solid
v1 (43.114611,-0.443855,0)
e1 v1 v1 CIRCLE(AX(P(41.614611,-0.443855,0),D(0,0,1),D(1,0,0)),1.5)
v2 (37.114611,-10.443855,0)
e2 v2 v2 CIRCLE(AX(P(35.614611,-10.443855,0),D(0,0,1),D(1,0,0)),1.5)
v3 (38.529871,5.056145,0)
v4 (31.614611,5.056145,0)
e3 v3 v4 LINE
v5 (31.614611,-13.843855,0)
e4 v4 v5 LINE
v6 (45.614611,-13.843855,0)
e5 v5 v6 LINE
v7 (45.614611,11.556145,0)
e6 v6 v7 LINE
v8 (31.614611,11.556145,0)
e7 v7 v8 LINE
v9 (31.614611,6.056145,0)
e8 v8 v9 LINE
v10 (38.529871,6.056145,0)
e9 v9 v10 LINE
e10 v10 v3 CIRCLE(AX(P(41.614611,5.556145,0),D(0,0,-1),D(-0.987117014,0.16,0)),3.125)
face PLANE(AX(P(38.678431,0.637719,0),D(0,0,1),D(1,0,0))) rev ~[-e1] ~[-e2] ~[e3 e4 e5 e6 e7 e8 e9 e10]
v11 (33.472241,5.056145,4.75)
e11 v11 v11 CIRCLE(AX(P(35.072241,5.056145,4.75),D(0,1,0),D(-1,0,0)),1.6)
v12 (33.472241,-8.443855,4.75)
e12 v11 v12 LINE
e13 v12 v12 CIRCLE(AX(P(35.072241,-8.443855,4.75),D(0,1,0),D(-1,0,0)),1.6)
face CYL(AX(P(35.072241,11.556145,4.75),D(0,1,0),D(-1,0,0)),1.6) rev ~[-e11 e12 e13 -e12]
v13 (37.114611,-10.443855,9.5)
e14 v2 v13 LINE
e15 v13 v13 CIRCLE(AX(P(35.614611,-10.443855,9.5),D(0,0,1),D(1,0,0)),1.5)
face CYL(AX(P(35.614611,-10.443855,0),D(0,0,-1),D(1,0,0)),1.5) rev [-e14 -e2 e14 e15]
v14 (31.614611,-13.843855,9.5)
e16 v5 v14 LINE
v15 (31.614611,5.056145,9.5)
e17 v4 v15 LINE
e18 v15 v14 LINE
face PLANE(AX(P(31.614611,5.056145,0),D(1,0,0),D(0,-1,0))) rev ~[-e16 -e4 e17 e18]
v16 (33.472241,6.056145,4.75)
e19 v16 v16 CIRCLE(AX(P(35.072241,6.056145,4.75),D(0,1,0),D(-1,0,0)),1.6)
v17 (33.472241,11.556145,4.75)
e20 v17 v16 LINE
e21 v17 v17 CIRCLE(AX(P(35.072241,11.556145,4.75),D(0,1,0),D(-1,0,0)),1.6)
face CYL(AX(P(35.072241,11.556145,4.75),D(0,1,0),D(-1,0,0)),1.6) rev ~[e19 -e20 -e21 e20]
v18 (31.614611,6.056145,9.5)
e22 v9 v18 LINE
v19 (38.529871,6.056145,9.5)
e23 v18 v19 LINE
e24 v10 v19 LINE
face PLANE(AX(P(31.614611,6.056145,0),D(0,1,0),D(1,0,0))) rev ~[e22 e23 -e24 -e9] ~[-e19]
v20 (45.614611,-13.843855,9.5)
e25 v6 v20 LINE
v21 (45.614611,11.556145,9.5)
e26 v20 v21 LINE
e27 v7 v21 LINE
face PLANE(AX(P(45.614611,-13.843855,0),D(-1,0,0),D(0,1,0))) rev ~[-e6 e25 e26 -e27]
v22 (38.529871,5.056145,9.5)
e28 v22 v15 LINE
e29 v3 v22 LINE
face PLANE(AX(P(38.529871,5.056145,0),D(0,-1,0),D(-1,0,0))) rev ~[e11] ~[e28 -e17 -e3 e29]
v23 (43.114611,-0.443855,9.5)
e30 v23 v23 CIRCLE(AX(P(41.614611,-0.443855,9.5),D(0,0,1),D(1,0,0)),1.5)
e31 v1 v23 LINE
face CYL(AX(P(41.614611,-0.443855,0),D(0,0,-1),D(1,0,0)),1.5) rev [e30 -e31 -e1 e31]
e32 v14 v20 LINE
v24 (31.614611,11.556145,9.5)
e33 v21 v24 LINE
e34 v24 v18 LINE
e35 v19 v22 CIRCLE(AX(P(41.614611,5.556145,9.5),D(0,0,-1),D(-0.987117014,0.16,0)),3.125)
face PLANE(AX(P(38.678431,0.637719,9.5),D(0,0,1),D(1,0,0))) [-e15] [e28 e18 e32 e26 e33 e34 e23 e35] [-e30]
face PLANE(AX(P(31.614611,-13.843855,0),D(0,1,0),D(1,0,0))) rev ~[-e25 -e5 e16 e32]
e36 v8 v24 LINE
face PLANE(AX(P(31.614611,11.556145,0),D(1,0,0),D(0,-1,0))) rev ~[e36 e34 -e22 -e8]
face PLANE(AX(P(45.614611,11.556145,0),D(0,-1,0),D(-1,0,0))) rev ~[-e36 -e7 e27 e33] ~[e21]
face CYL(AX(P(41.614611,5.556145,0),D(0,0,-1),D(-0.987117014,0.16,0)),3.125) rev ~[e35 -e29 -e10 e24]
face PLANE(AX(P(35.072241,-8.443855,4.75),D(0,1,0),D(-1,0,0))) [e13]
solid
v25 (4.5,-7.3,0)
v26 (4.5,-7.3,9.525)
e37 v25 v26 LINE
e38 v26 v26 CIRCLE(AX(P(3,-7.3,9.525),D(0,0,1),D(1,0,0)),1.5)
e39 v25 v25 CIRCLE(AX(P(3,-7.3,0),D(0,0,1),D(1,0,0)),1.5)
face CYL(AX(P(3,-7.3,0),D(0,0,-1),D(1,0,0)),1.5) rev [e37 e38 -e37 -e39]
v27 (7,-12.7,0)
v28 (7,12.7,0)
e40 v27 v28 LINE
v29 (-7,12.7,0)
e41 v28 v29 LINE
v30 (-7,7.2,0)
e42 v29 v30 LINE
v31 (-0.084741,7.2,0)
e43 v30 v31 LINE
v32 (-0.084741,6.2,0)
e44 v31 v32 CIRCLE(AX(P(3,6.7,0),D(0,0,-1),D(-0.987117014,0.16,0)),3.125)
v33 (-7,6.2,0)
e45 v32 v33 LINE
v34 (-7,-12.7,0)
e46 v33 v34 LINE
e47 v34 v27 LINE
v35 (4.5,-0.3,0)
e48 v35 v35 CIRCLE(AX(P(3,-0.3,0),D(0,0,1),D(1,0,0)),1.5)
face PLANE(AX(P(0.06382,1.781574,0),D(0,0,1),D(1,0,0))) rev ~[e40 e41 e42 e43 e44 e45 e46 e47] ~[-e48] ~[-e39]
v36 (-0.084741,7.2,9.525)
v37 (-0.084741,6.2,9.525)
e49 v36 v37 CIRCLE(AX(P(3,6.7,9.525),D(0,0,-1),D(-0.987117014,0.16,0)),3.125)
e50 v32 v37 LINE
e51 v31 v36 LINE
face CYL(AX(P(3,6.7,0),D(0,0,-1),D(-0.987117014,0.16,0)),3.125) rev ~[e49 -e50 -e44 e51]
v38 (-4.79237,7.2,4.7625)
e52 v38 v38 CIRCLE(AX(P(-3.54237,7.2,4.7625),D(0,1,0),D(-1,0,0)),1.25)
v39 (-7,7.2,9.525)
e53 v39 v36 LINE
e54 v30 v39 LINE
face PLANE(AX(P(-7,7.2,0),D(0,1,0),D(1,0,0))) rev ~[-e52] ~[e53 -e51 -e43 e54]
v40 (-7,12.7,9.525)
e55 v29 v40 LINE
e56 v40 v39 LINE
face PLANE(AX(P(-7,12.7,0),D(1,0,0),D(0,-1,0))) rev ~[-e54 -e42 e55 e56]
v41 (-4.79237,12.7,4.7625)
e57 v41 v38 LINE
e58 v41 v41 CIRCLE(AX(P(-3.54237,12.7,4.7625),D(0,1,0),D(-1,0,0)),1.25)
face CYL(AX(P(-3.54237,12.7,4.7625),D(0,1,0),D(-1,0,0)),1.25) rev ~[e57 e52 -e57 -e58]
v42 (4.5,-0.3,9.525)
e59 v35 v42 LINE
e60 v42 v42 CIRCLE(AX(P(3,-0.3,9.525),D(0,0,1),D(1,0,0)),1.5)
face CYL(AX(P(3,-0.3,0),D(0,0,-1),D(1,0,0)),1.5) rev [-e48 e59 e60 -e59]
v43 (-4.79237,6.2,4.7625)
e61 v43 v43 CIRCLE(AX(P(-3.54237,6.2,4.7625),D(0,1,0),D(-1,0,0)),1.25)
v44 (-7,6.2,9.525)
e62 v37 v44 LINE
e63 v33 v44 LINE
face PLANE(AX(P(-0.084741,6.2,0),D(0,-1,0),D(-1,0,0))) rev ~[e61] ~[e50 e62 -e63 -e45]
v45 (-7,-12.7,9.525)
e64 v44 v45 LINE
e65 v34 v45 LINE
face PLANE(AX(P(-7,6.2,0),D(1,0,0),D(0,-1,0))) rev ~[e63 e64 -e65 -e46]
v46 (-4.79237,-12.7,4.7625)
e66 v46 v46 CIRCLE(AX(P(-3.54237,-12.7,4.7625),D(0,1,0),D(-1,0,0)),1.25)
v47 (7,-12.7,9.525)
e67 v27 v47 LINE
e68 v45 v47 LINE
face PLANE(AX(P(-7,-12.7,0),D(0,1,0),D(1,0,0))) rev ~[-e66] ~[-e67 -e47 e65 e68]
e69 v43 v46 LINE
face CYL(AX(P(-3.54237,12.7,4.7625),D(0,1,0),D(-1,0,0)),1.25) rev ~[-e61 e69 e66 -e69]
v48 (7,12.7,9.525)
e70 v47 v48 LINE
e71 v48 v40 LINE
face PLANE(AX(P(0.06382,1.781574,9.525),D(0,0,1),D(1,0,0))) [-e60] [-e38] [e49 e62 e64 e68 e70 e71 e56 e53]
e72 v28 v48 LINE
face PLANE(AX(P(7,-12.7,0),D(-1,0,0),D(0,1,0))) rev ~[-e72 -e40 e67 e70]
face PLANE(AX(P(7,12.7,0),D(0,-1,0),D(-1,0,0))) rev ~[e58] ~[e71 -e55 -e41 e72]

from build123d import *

# Parameters (mm, degrees)
F0_R     = 1.5
F1_DEPTH = 9.525
F2_R     = 1.25
F3_DEPTH = 25.401
F4_R     = 1.5
F5_DEPTH = 9.5
F6_R     = 1.6
F7_DEPTH = 20


# Not quite as in the source:
# - a length typed as a fraction of an inch, garbled in the dataset ("3 / 203.2 mm" for 3/8 in), is restored


with BuildPart() as f1:
    # F0 (on Top) → F1 (new body)
    with BuildSketch(Plane.XY):
        with BuildLine():
            Line((-7, -12.7), (7, -12.7))
            Line((7, -12.7), (7, 12.7))
            Line((7, 12.7), (-7, 12.7))
            Line((-7, 12.7), (-7, 7.2))
            Line((-7, 7.2), (-0.0847406698, 7.2))
            ThreePointArc((-0.0847406698, 7.2), (6.125, 6.7), (-0.0847406698, 6.2))
            Line((-0.0847406698, 6.2), (-7, 6.2))
            Line((-7, 6.2), (-7, -12.7))
        make_face()
        with Locations((3, -7.3)):
            Circle(F0_R, mode=Mode.SUBTRACT)
        with Locations((3, -0.3)):
            Circle(F0_R, mode=Mode.SUBTRACT)
    extrude(amount=F1_DEPTH)

    # F2 (on face) → F3 (cut, through all)
    with BuildSketch(Plane(origin=(0, 12.7, 0), x_dir=(-1, 0, 0), z_dir=(0, 1, 0))):
        with Locations((3.5423703349, 4.7625)):
            Circle(F2_R)
    extrude(amount=-F3_DEPTH, mode=Mode.SUBTRACT)


with BuildPart() as f5:
    # F4 (on Top) → F5 (new body)
    with BuildSketch(Plane.XY):
        with BuildLine():
            Line((31.6146114171, -13.843855077), (45.6146114171, -13.843855077))
            Line((45.6146114171, -13.843855077), (45.6146114171, 11.556144923))
            Line((45.6146114171, 11.556144923), (31.6146114171, 11.556144923))
            Line((31.6146114171, 11.556144923), (31.6146114171, 6.056144923))
            Line((31.6146114171, 6.056144923), (38.5298707472, 6.056144923))
            ThreePointArc((38.5298707472, 6.056144923), (44.7396114171, 5.556144923), (38.5298707472, 5.056144923))
            Line((38.5298707472, 5.056144923), (31.6146114171, 5.056144923))
            Line((31.6146114171, 5.056144923), (31.6146114171, -13.843855077))
        make_face()
        with Locations((35.6146114171, -10.443855077)):
            Circle(F4_R, mode=Mode.SUBTRACT)
        with Locations((41.6146114171, -0.443855077)):
            Circle(F4_R, mode=Mode.SUBTRACT)
    extrude(amount=F5_DEPTH)

    # F6 (on face) → F7 (cut)
    with BuildSketch(Plane(origin=(0, 11.556144923, 0), x_dir=(-1, 0, 0), z_dir=(0, 1, 0))):
        with Locations((-35.0722410821, 4.75)):
            Circle(F6_R)
    extrude(amount=-F7_DEPTH, mode=Mode.SUBTRACT)


solid = Compound([f1.part, f5.part])
